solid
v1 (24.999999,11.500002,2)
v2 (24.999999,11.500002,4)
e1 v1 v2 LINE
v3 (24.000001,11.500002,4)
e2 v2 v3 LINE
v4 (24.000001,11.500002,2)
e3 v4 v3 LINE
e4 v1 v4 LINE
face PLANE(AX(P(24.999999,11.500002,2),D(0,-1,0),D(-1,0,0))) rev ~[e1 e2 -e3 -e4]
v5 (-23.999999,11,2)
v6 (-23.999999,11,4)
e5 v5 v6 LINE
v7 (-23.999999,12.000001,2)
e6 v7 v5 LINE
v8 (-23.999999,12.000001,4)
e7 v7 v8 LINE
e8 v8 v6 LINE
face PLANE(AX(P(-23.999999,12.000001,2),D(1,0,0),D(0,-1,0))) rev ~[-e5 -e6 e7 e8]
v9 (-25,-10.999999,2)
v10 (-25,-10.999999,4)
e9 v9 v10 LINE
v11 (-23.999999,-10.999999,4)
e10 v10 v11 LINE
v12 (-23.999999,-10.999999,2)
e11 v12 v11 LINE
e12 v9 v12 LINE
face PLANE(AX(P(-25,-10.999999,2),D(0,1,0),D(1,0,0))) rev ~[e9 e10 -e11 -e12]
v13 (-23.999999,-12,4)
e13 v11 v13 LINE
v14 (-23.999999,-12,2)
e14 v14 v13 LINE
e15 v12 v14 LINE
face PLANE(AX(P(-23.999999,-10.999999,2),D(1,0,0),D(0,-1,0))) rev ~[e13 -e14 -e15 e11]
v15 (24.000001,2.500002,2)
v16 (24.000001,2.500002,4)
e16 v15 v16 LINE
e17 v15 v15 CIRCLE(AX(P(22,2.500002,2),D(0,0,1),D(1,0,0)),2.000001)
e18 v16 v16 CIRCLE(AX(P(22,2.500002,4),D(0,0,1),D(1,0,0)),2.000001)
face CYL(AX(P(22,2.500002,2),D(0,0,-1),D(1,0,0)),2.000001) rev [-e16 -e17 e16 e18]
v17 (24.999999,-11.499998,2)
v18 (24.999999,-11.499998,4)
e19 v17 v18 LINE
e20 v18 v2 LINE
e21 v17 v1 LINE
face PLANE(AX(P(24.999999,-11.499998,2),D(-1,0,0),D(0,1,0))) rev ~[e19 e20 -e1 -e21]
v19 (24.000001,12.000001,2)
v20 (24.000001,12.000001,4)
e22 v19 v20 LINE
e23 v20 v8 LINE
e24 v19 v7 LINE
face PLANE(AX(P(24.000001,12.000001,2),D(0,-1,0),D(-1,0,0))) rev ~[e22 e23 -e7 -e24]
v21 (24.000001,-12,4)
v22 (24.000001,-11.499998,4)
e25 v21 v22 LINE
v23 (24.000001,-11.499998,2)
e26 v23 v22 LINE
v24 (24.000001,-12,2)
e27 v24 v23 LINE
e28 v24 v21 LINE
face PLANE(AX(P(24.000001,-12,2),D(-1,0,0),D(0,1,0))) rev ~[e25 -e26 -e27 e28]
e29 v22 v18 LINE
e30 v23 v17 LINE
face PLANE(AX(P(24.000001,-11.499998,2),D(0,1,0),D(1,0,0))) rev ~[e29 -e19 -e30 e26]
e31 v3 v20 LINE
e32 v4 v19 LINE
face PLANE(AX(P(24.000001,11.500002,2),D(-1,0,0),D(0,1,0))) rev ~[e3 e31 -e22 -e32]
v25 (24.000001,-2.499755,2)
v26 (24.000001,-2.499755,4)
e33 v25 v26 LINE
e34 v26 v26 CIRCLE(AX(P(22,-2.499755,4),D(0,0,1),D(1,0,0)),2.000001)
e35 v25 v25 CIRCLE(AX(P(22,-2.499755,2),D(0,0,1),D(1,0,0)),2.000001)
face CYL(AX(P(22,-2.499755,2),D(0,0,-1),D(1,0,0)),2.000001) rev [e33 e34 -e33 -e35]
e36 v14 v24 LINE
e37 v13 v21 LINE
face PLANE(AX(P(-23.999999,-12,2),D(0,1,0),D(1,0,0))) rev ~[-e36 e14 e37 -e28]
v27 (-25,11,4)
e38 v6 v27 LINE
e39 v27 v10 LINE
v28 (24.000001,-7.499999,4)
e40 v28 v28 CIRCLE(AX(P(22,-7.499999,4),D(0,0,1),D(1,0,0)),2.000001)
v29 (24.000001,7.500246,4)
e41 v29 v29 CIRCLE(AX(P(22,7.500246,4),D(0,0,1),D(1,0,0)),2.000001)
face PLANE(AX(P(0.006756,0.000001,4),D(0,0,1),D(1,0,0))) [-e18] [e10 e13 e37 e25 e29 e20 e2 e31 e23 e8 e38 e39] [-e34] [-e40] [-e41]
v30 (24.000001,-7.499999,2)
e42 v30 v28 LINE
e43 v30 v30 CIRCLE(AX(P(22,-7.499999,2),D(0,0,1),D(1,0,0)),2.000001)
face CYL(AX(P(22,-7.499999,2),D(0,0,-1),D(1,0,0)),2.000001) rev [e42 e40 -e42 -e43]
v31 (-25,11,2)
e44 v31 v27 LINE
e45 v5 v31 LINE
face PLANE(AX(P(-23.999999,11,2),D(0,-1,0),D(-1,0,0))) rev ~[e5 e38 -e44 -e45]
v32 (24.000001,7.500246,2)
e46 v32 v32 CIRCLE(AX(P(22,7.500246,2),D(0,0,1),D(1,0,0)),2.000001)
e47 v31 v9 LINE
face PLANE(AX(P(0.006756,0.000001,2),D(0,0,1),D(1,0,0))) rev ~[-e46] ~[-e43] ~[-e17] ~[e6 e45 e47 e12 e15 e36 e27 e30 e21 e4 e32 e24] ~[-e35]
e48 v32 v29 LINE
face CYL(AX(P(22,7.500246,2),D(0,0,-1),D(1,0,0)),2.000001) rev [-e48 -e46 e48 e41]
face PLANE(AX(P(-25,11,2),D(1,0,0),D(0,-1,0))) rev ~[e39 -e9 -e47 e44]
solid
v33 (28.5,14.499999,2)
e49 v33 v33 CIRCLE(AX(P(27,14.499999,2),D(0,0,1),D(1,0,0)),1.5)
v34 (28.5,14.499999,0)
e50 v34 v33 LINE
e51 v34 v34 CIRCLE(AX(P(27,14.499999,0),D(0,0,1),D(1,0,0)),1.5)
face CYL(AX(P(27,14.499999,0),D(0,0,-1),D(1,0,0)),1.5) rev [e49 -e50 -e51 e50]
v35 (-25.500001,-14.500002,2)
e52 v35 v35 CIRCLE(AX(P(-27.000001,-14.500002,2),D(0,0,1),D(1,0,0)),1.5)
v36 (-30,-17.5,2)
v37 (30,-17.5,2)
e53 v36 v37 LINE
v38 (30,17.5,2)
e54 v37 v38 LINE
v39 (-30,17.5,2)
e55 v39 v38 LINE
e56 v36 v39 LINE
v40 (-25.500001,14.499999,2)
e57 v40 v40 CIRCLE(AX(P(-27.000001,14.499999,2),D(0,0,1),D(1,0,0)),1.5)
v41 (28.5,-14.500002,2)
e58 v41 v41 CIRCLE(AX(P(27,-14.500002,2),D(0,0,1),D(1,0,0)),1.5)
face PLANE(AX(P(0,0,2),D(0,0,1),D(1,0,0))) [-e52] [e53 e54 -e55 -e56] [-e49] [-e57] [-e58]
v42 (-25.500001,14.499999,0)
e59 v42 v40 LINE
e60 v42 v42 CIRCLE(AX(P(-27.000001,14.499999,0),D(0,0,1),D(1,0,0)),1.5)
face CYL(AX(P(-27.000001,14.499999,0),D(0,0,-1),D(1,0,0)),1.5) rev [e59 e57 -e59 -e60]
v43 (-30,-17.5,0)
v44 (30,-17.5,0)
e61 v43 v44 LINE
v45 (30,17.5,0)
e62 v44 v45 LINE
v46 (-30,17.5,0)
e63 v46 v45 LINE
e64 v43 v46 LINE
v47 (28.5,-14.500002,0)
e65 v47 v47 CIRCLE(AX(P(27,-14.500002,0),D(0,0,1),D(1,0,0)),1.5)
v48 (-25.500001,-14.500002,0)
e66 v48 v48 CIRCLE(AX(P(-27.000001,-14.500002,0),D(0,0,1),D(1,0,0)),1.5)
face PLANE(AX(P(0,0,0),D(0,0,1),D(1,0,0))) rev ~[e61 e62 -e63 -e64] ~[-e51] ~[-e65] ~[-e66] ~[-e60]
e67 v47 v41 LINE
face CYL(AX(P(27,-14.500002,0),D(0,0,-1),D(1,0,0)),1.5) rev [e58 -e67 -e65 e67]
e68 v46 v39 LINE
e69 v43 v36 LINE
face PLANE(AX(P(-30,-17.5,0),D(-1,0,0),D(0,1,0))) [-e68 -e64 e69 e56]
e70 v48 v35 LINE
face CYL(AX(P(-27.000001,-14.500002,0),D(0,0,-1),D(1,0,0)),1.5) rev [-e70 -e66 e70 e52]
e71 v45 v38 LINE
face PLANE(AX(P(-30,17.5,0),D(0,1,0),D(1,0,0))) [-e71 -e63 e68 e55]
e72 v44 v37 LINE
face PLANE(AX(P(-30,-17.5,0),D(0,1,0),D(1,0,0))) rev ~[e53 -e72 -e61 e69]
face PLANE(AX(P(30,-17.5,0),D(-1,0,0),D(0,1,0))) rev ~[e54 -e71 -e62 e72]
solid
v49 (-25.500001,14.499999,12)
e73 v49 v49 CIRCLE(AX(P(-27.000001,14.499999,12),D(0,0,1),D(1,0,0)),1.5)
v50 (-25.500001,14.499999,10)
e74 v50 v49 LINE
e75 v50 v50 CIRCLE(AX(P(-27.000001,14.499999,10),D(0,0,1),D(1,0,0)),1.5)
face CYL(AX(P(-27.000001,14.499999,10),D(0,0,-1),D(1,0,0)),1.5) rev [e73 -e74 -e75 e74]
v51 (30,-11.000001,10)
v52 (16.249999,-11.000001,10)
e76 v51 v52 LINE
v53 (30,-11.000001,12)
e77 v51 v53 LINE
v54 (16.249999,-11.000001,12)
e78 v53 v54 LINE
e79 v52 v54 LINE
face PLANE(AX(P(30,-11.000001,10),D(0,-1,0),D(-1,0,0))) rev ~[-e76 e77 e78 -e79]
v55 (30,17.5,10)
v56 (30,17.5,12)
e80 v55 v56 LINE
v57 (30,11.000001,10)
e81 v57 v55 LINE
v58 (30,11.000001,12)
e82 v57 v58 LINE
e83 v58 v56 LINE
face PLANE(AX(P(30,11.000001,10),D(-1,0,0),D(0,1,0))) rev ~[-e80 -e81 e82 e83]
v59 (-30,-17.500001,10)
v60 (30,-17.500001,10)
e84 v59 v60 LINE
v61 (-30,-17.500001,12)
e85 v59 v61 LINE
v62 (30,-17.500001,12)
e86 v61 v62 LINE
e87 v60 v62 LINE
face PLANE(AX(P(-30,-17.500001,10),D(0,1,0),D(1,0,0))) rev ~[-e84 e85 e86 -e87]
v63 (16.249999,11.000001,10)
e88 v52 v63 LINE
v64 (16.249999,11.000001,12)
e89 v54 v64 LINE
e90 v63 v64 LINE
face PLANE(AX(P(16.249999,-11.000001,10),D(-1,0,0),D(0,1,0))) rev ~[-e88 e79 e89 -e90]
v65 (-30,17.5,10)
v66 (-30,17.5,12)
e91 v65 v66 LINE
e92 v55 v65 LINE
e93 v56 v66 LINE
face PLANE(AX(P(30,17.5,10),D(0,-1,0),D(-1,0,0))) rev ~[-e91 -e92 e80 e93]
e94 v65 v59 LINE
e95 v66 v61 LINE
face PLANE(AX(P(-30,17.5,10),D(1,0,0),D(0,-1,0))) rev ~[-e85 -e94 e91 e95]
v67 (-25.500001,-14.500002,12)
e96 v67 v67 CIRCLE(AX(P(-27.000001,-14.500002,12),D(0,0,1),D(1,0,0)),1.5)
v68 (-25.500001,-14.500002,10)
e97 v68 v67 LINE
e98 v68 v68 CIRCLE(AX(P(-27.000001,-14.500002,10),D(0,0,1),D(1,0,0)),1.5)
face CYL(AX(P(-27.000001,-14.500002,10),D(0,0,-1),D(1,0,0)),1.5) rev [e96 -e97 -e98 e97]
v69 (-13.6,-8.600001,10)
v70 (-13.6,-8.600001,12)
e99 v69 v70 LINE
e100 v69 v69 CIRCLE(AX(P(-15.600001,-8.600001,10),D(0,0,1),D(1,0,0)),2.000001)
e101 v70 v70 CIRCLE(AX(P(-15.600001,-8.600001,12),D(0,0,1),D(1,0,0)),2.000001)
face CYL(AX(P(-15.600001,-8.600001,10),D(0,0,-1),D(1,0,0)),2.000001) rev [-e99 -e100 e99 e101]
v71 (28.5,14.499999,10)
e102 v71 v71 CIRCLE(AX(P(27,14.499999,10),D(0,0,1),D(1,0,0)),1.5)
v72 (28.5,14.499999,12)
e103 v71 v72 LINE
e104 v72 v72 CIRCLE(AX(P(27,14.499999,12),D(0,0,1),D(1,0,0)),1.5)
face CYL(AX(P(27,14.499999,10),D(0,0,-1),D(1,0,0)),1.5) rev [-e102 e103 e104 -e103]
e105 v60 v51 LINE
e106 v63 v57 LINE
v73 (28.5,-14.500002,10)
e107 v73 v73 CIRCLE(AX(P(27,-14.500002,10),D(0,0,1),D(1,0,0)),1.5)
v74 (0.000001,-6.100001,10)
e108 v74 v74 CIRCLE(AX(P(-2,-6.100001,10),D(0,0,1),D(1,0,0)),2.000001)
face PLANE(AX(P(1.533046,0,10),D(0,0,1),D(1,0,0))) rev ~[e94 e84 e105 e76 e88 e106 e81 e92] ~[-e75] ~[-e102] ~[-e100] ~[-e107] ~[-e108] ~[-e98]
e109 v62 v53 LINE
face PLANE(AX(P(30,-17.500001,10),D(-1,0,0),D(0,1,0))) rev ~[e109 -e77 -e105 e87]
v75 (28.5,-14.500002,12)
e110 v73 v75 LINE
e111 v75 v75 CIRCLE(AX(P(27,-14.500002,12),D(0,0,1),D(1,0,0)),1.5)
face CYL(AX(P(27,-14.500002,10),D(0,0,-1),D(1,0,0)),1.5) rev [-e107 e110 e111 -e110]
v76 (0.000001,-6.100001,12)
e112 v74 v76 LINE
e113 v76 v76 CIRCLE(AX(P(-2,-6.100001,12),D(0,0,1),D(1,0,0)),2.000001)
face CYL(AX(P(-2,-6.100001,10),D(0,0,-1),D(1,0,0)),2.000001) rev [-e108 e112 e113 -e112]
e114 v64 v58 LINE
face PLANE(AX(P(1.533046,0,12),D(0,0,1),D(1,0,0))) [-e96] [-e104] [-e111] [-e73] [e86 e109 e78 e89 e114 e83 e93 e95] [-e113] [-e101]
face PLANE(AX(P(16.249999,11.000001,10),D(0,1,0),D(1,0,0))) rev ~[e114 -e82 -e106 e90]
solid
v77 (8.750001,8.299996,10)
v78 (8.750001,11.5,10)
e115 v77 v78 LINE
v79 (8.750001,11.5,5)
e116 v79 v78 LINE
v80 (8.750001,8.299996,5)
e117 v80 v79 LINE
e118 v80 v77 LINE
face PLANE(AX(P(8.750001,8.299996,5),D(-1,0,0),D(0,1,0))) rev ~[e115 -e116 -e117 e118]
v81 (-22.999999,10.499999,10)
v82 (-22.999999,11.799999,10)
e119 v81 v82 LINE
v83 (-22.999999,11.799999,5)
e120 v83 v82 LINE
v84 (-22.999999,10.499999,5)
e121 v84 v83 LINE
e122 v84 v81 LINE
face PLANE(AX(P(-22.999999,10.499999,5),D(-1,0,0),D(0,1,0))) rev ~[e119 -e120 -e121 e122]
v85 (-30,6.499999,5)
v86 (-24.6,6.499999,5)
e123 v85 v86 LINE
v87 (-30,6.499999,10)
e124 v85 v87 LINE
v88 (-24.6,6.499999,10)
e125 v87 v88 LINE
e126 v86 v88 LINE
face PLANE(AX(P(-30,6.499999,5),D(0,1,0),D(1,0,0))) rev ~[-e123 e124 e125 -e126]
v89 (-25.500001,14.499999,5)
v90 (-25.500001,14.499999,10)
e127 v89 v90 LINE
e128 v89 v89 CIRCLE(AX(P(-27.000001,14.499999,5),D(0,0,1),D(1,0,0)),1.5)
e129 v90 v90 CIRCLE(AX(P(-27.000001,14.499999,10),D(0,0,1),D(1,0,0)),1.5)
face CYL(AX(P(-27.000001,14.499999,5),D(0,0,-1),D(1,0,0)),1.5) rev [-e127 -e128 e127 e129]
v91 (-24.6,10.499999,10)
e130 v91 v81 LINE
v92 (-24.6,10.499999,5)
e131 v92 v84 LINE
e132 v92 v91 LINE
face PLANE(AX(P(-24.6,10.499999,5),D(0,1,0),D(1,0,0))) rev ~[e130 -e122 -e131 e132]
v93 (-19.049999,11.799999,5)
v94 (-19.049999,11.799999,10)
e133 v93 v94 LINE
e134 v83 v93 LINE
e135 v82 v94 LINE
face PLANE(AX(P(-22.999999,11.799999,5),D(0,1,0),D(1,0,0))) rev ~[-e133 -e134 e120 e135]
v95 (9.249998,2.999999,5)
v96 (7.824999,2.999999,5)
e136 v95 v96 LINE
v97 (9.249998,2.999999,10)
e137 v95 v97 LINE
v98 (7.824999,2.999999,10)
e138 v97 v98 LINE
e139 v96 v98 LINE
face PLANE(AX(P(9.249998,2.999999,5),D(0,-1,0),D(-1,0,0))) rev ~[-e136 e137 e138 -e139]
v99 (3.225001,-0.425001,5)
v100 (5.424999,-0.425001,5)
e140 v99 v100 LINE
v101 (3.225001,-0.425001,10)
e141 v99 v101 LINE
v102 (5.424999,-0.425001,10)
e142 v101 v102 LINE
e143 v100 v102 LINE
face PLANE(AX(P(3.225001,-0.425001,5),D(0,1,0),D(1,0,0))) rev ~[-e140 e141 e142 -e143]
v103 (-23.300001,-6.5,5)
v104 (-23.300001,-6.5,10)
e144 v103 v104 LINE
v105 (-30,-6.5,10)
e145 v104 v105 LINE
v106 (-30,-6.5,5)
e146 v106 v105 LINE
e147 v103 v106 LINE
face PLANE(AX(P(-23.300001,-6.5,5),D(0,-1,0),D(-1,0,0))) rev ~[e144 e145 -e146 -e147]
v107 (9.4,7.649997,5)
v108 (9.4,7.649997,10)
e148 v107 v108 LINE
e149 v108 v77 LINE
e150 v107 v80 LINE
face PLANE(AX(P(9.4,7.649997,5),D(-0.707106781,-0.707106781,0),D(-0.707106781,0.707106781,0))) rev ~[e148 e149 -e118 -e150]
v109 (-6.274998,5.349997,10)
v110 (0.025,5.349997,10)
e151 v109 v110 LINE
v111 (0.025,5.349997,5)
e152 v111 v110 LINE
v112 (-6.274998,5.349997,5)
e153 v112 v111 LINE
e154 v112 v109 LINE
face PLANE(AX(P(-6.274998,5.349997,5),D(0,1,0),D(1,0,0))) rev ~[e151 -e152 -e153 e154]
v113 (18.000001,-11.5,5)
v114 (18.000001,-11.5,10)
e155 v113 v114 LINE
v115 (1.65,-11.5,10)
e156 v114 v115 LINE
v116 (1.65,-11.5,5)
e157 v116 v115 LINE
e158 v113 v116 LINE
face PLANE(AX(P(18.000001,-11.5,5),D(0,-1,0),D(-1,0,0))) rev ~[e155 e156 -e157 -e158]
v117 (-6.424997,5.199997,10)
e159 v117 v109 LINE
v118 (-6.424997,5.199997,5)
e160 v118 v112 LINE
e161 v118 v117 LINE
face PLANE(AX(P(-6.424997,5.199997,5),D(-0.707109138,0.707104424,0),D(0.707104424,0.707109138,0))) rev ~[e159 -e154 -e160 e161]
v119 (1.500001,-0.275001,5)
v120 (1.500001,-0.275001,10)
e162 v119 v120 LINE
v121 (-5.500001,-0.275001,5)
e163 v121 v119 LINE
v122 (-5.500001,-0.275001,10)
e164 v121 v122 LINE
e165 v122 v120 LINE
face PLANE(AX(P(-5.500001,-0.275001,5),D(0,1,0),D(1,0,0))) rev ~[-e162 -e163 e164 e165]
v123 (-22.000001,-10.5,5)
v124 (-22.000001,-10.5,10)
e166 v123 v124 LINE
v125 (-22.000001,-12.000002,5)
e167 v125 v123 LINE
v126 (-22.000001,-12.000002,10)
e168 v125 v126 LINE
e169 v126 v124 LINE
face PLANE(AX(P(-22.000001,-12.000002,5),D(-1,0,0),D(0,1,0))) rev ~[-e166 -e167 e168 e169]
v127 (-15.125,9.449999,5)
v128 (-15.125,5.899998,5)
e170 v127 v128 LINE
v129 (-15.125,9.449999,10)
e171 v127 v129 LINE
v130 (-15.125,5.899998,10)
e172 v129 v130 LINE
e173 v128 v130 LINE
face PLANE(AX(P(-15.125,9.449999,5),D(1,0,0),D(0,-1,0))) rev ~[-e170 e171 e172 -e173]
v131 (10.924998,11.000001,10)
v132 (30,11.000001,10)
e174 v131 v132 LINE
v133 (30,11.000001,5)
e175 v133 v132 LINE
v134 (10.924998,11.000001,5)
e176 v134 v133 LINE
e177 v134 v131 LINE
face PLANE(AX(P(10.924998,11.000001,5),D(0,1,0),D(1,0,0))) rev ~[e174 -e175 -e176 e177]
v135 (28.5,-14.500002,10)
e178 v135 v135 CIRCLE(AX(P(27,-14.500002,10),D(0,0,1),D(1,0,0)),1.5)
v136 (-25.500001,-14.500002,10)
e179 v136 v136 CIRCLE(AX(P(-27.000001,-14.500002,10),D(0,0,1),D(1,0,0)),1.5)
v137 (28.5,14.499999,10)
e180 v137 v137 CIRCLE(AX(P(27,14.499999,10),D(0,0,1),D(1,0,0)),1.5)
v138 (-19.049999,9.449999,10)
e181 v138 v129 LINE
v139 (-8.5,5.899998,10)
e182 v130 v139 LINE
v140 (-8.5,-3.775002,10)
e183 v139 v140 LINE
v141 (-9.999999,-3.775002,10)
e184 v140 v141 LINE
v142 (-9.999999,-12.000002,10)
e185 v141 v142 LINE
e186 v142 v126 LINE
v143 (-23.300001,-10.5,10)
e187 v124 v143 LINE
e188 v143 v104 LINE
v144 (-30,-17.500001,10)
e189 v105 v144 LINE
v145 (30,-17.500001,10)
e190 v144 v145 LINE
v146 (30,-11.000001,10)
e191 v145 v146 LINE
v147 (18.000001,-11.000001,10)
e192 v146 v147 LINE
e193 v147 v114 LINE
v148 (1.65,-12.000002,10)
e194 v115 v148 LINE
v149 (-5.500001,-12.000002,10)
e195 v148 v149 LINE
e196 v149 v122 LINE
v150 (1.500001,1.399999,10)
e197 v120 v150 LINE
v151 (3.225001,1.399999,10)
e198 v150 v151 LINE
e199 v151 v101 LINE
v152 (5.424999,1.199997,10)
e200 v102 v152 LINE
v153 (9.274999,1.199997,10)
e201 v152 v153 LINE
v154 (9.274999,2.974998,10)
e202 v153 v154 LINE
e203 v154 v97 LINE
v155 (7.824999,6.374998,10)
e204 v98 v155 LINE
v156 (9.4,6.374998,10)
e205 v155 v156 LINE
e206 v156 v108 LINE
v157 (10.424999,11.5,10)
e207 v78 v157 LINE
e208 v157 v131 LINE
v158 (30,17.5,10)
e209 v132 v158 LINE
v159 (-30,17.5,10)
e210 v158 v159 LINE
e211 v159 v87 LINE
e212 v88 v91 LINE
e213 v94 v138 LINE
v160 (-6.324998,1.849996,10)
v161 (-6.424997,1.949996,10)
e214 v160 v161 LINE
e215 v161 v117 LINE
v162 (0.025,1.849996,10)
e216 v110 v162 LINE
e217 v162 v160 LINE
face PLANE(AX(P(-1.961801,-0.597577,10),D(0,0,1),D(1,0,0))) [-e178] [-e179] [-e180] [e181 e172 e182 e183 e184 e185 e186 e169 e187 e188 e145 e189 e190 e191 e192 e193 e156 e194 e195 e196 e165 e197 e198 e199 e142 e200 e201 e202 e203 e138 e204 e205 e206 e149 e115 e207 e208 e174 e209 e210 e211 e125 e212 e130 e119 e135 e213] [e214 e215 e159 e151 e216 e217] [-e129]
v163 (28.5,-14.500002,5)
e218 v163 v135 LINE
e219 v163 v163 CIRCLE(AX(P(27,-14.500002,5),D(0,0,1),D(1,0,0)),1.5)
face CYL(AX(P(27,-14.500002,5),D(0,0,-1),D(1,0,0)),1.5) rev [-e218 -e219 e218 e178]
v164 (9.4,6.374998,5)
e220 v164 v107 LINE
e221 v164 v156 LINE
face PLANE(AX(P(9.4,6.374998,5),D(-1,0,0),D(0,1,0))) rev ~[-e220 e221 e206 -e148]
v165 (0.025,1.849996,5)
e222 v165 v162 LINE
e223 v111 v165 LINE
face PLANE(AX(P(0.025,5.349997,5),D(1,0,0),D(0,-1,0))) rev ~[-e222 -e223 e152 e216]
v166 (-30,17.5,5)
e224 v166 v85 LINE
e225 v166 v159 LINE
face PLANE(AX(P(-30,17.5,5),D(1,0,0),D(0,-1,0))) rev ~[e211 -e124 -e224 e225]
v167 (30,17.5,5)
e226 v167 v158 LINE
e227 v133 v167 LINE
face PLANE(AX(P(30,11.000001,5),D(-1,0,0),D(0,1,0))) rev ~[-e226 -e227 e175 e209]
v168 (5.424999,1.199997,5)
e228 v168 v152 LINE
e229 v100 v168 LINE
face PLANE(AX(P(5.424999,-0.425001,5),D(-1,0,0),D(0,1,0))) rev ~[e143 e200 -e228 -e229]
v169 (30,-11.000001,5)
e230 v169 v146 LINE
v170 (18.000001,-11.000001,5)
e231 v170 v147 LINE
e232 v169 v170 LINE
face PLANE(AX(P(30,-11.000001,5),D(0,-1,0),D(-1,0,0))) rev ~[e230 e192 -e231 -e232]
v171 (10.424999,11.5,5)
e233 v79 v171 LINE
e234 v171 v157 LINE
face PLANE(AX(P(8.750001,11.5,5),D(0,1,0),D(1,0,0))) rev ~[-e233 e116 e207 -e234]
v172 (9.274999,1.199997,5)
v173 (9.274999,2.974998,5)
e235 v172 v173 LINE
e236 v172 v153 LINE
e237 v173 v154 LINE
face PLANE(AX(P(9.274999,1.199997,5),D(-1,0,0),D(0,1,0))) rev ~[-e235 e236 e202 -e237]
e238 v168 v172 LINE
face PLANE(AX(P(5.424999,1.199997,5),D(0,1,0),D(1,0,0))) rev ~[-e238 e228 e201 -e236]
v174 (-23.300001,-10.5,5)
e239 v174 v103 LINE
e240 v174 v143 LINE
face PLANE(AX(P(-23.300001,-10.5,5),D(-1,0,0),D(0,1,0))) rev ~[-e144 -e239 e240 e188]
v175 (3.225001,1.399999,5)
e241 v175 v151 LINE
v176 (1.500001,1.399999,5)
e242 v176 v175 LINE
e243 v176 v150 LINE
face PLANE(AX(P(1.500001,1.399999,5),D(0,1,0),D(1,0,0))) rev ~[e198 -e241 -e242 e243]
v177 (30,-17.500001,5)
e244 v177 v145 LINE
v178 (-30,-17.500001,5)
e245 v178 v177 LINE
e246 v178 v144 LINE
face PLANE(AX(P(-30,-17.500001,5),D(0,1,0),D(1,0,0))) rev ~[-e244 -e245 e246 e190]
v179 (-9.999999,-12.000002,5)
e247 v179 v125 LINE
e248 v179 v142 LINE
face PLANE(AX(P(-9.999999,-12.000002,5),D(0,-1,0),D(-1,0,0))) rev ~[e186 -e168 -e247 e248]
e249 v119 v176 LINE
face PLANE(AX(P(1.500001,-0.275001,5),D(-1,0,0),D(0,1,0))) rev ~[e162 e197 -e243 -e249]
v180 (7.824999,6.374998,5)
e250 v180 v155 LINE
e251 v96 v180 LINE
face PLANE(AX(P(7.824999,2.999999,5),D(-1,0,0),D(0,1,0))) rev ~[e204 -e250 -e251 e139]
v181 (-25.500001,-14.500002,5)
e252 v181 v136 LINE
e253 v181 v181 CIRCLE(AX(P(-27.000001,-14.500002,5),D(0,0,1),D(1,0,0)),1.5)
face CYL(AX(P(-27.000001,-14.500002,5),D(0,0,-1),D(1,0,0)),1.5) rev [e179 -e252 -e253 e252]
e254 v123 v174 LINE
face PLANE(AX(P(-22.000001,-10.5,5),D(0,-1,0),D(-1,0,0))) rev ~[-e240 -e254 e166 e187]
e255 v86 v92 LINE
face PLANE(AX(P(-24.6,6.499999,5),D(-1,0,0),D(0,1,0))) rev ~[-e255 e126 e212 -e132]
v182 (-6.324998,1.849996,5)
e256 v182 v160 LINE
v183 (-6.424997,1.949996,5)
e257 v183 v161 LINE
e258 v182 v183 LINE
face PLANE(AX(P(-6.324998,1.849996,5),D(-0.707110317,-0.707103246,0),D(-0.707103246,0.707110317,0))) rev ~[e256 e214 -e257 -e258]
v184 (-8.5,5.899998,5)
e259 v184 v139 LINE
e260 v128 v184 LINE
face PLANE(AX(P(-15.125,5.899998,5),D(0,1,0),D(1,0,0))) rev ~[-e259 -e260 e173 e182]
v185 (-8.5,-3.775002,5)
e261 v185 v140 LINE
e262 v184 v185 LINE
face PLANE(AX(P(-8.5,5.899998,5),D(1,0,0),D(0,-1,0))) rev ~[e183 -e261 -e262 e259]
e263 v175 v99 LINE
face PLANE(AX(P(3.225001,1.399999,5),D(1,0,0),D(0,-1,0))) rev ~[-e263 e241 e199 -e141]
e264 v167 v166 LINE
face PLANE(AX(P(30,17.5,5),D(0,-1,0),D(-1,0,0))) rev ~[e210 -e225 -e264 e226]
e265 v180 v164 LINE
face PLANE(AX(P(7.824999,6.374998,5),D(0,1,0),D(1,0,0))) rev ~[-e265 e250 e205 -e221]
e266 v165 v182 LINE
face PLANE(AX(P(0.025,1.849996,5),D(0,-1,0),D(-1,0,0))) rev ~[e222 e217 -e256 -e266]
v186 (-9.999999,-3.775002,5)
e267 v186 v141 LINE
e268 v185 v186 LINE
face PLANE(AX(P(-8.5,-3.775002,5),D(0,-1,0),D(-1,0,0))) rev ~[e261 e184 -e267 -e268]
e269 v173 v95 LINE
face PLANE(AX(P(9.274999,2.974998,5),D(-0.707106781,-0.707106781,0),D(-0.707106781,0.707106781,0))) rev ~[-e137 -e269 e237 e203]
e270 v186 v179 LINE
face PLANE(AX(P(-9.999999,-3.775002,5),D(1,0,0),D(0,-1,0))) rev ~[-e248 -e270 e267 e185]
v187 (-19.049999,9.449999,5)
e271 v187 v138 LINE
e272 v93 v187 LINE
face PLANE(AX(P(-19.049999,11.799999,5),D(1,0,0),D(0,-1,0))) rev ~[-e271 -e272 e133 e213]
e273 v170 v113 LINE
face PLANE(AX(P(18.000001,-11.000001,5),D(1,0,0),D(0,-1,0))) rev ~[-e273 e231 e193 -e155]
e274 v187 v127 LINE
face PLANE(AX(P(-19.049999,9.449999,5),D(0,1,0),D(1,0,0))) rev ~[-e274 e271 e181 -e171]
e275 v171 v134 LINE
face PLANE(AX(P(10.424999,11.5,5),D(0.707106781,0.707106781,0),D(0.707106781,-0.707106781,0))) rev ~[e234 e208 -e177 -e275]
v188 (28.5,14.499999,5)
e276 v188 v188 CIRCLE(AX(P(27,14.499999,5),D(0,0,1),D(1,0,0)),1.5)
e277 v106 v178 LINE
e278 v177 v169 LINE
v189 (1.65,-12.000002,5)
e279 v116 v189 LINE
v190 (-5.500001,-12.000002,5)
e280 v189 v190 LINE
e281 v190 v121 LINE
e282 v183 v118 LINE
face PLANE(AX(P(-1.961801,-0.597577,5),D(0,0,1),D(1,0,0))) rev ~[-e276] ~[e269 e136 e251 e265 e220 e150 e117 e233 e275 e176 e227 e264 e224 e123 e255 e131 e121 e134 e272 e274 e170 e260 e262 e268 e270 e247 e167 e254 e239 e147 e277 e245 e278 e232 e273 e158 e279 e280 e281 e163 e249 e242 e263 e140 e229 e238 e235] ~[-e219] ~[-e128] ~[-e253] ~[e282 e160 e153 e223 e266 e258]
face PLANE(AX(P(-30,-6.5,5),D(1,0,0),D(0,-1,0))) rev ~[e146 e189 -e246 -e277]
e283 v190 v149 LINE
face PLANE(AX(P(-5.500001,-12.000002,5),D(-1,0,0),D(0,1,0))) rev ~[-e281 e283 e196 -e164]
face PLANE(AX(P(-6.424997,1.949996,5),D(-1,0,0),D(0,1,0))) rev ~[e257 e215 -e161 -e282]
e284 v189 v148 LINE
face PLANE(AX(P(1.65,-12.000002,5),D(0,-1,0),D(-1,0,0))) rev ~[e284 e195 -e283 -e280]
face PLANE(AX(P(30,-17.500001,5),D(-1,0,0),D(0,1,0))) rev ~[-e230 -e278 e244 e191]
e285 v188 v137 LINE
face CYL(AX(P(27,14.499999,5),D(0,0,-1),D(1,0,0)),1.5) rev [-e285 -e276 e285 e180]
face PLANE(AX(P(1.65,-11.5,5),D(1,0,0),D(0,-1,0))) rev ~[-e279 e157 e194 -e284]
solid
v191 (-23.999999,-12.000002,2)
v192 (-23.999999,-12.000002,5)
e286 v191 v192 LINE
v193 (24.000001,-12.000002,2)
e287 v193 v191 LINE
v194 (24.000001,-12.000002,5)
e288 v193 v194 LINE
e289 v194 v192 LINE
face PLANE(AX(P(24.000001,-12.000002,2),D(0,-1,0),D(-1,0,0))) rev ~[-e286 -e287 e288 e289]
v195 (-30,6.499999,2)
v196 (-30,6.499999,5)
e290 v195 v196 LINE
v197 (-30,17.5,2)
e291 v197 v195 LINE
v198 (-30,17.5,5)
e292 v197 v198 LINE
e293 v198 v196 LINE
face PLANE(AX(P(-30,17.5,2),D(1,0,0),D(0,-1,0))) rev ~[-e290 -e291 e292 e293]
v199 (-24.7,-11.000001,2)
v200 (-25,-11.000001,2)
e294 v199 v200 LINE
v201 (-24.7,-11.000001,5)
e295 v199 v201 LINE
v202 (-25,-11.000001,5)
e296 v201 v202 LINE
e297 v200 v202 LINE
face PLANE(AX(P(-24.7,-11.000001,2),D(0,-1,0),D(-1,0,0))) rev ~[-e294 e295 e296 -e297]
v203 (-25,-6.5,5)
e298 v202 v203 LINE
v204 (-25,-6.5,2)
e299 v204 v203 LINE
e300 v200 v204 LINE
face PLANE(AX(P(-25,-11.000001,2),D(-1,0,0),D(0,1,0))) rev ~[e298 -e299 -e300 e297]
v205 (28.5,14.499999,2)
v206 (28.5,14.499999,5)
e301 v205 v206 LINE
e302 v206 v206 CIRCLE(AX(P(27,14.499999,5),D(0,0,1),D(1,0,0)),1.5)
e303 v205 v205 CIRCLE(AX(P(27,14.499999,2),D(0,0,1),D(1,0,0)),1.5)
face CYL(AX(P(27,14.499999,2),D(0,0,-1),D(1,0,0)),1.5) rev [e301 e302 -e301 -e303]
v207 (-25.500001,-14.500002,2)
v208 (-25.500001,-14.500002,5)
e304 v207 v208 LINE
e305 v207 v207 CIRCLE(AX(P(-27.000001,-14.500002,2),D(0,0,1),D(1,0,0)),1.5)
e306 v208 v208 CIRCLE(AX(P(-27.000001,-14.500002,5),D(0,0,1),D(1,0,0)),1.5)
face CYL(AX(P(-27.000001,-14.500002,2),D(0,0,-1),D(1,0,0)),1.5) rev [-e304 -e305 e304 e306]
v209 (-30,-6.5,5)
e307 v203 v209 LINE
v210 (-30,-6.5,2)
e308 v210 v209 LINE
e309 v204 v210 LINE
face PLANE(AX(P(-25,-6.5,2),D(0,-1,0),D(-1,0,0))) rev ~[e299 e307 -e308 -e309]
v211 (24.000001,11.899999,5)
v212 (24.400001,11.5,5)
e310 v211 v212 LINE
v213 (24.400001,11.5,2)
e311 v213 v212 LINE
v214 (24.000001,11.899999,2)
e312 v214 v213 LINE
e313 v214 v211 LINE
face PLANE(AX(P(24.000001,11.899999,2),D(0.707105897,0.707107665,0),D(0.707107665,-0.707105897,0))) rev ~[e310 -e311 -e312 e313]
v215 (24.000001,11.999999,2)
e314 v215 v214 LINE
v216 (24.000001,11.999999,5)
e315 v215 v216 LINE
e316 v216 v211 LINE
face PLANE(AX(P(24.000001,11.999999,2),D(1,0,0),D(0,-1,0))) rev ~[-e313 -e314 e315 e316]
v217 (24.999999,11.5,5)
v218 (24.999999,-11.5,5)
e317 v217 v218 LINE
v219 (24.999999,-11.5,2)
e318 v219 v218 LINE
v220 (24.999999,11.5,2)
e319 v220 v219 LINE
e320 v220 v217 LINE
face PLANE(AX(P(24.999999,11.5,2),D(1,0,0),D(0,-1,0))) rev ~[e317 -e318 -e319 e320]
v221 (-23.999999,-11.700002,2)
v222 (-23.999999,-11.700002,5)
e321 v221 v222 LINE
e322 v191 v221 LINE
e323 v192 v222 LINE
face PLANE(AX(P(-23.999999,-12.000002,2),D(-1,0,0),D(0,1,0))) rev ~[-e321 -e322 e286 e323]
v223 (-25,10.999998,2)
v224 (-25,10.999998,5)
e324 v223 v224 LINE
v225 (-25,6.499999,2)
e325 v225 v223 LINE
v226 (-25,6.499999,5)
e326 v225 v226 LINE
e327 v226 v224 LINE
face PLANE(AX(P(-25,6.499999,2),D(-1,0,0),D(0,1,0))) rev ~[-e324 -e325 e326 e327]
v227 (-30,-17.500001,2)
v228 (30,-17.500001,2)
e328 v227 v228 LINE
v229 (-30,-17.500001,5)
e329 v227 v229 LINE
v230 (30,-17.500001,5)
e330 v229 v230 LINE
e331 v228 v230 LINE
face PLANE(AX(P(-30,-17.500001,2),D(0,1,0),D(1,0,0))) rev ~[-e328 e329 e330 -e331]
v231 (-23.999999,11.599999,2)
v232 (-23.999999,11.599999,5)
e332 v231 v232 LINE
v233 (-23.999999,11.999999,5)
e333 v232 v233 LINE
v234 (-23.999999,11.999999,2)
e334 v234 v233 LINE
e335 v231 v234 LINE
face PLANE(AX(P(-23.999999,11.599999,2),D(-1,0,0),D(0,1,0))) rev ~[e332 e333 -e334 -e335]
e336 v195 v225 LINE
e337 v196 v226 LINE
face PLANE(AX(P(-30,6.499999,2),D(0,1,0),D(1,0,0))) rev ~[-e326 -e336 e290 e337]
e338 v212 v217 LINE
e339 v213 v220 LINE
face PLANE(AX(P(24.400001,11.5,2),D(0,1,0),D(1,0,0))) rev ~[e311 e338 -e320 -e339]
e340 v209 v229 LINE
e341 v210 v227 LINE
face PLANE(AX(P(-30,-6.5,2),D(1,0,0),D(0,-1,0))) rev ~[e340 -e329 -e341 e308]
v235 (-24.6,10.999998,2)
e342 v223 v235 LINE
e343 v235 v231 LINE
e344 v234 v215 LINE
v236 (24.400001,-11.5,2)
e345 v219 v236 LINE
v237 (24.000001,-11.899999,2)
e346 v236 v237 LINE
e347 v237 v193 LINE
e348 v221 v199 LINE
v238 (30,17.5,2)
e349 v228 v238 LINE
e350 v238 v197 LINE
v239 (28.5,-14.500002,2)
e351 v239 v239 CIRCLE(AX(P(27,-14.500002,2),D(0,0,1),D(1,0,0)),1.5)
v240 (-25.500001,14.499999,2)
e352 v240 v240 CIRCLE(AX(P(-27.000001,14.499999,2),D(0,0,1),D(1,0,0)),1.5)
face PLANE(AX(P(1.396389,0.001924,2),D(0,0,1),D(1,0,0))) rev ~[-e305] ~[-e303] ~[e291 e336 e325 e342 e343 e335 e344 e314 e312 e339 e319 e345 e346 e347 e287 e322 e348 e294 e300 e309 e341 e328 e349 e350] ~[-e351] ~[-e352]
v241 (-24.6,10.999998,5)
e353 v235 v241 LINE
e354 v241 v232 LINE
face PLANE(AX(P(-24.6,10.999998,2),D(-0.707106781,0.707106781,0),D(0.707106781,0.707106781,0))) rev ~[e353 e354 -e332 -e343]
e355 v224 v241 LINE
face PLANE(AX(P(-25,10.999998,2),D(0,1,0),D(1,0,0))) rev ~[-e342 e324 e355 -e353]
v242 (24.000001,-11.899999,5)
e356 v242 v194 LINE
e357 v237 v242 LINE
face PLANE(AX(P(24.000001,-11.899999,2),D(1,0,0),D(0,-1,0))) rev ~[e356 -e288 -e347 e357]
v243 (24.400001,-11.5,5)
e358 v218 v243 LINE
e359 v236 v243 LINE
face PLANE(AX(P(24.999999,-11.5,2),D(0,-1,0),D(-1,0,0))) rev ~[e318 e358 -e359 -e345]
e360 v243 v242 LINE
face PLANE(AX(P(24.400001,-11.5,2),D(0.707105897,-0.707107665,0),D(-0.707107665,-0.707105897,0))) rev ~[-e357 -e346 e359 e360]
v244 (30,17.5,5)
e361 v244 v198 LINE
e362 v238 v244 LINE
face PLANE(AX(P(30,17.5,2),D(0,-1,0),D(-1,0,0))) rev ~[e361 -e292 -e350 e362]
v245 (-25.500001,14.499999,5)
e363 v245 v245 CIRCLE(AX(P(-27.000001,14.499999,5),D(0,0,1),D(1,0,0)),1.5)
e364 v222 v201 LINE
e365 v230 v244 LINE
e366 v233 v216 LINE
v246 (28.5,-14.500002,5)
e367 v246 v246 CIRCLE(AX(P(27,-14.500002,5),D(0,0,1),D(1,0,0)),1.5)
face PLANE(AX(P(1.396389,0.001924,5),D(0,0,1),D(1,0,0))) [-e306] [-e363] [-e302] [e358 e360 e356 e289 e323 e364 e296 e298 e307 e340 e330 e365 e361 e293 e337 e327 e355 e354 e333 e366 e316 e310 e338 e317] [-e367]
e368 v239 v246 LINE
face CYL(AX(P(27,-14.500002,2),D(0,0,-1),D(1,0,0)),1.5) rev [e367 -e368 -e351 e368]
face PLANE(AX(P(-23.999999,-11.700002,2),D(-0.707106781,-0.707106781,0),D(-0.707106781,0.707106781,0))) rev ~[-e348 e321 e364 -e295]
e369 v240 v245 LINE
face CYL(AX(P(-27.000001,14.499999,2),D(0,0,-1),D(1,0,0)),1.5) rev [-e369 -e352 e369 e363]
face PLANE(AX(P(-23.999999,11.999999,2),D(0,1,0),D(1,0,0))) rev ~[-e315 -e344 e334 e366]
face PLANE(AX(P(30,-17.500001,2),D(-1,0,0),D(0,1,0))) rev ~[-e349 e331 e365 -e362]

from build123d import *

# Parameters (mm, degrees)
F0_W      = 60
F0_H      = 35.000001
F0_R      = 1.5
F1_DEPTH  = 2
F3_R      = 1.5
F4_DEPTH  = 3
F5_R      = 2.000001
F6_DEPTH  = 2
F8_R      = 1.5
F9_DEPTH  = 5
F11_R     = 1.5
F11_R_2   = 2.000001
F12_DEPTH = 2


with BuildPart() as f1:
    # F0 (on Top) → F1 (new body)
    with BuildSketch(Plane.XY):
        with Locations((0, -5e-07)):
            Rectangle(F0_W, F0_H)
        with Locations((-27.000001, -14.500002)):
            Circle(F0_R, mode=Mode.SUBTRACT)
        with Locations((27, -14.500002)):
            Circle(F0_R, mode=Mode.SUBTRACT)
        with Locations((-27.000001, 14.499999)):
            Circle(F0_R, mode=Mode.SUBTRACT)
        with Locations((27, 14.499999)):
            Circle(F0_R, mode=Mode.SUBTRACT)
    extrude(amount=F1_DEPTH)


with BuildPart() as f4:
    # F3 (on offset) → F4 (new body)
    with BuildSketch(Plane.XY.offset(2)):
        Polygon((24.000001, -11.899999), (24.000001, -12.000002), (-23.999999, -12.000002), (-23.999999, -11.700002), (-24.7, -11.000001), (-25, -11.000001), (-25, -6.5), (-30, -6.5), (-30, -17.500001), (30, -17.500001), (30, 11.000001), (30, 17.5), (-30, 17.5), (-30, 6.499999), (-25, 6.499999), (-25, 10.999998), (-24.6, 10.999998), (-23.999999, 11.599999), (-23.999999, 11.999999), (24.000001, 11.999999), (24.000001, 11.899999), (24.400001, 11.5), (24.999999, 11.5), (24.999999, -11.5), (24.400001, -11.5), align=None)
        with Locations((-27.000001, -14.500002)):
            Circle(F3_R, mode=Mode.SUBTRACT)
        with Locations((27, -14.500002)):
            Circle(F3_R, mode=Mode.SUBTRACT)
        with Locations((-27.000001, 14.499999)):
            Circle(F3_R, mode=Mode.SUBTRACT)
        with Locations((27, 14.499999)):
            Circle(F3_R, mode=Mode.SUBTRACT)
    extrude(amount=F4_DEPTH)


with BuildPart() as f6:
    # F5 (on offset) → F6 (new body)
    with BuildSketch(Plane.XY.offset(2)):
        Polygon((-23.999999, -10.999999), (-23.999999, -12), (24.000001, -12), (24.000001, -11.499998), (24.999999, -11.499998), (24.999999, 11.500002), (24.000001, 11.500002), (24.000001, 12.000001), (-23.999999, 12.000001), (-23.999999, 11), (-25, 11), (-25, -10.999999), align=None)
        with Locations((22, -7.499999)):
            Circle(F5_R, mode=Mode.SUBTRACT)
        with Locations((22, -2.499755)):
            Circle(F5_R, mode=Mode.SUBTRACT)
        with Locations((22, 2.500002)):
            Circle(F5_R, mode=Mode.SUBTRACT)
        with Locations((22, 7.500246)):
            Circle(F5_R, mode=Mode.SUBTRACT)
    extrude(amount=F6_DEPTH)


with BuildPart() as f9:
    # F8 (on offset) → F9 (new body)
    with BuildSketch(Plane.XY.offset(5)):
        Polygon((-22.999999, 10.499999), (-22.999999, 11.799999), (-19.049999, 11.799999), (-19.049999, 9.449999), (-15.125, 9.449999), (-15.125, 5.899998), (-8.5, 5.899998), (-8.5, -1.5), (-8.5, -3.775002), (-9.999999, -3.775002), (-9.999999, -4.900001), (-9.999999, -12.000002), (-22.000001, -12.000002), (-22.000001, -10.5), (-23.300001, -10.5), (-23.300001, -6.5), (-30, -6.5), (-30, -17.500001), (30, -17.500001), (30, -11.000001), (18.000001, -11.000001), (18.000001, -11.5), (15.500001, -11.5), (10.000001, -11.5), (2.750001, -11.5), (1.65, -11.5), (1.65, -12.000002), (1.399998, -12.000002), (-5.500001, -12.000002), (-5.500001, -0.950001), (-5.500001, -0.275001), (1.500001, -0.275001), (1.500001, 1.399999), (3.225001, 1.399999), (3.225001, -0.425001), (5.424999, -0.425001), (5.424999, 1.199997), (5.65, 1.199997), (9.274999, 1.199997), (9.274999, 2.974998), (9.249998, 2.999999), (7.824999, 2.999999), (7.824999, 6.374998), (9.4, 6.374998), (9.4, 7.649997), (8.750001, 8.299996), (8.750001, 11.5), (10.424999, 11.5), (10.924998, 11.000001), (17.2, 11.000001), (30, 11.000001), (30, 17.5), (-30, 17.5), (-30, 6.499999), (-26, 6.499999), (-24.6, 6.499999), (-24.6, 10.499999), align=None)
        with Locations((-27.000001, -14.500002)):
            Circle(F8_R, mode=Mode.SUBTRACT)
        with Locations((27, -14.500002)):
            Circle(F8_R, mode=Mode.SUBTRACT)
        Polygon((0.025, 5.349997), (0.025, 1.849996), (-6.324998, 1.849996), (-6.424997, 1.949996), (-6.424997, 5.199997), (-6.274998, 5.349997), align=None, mode=Mode.SUBTRACT)
        with Locations((-27.000001, 14.499999)):
            Circle(F8_R, mode=Mode.SUBTRACT)
        with Locations((27, 14.499999)):
            Circle(F8_R, mode=Mode.SUBTRACT)
    extrude(amount=F9_DEPTH)


with BuildPart() as f12:
    # F11 (on offset) → F12 (new body)
    with BuildSketch(Plane.XY.offset(10)):
        Polygon((-30, 17.5), (-30, -17.500001), (30, -17.500001), (30, -11.000001), (16.249999, -11.000001), (16.249999, 11.000001), (30, 11.000001), (30, 17.5), align=None)
        with Locations((-27.000001, -14.500002)):
            Circle(F11_R, mode=Mode.SUBTRACT)
        with Locations((-15.600001, -8.600001)):
            Circle(F11_R_2, mode=Mode.SUBTRACT)
        with Locations((-2, -6.100001)):
            Circle(F11_R_2, mode=Mode.SUBTRACT)
        with Locations((27, -14.500002)):
            Circle(F11_R, mode=Mode.SUBTRACT)
        with Locations((-27.000001, 14.499999)):
            Circle(F11_R, mode=Mode.SUBTRACT)
        with Locations((27, 14.499999)):
            Circle(F11_R, mode=Mode.SUBTRACT)
    extrude(amount=F12_DEPTH)


solid = Compound([f1.part, f4.part, f6.part, f9.part, f12.part])
